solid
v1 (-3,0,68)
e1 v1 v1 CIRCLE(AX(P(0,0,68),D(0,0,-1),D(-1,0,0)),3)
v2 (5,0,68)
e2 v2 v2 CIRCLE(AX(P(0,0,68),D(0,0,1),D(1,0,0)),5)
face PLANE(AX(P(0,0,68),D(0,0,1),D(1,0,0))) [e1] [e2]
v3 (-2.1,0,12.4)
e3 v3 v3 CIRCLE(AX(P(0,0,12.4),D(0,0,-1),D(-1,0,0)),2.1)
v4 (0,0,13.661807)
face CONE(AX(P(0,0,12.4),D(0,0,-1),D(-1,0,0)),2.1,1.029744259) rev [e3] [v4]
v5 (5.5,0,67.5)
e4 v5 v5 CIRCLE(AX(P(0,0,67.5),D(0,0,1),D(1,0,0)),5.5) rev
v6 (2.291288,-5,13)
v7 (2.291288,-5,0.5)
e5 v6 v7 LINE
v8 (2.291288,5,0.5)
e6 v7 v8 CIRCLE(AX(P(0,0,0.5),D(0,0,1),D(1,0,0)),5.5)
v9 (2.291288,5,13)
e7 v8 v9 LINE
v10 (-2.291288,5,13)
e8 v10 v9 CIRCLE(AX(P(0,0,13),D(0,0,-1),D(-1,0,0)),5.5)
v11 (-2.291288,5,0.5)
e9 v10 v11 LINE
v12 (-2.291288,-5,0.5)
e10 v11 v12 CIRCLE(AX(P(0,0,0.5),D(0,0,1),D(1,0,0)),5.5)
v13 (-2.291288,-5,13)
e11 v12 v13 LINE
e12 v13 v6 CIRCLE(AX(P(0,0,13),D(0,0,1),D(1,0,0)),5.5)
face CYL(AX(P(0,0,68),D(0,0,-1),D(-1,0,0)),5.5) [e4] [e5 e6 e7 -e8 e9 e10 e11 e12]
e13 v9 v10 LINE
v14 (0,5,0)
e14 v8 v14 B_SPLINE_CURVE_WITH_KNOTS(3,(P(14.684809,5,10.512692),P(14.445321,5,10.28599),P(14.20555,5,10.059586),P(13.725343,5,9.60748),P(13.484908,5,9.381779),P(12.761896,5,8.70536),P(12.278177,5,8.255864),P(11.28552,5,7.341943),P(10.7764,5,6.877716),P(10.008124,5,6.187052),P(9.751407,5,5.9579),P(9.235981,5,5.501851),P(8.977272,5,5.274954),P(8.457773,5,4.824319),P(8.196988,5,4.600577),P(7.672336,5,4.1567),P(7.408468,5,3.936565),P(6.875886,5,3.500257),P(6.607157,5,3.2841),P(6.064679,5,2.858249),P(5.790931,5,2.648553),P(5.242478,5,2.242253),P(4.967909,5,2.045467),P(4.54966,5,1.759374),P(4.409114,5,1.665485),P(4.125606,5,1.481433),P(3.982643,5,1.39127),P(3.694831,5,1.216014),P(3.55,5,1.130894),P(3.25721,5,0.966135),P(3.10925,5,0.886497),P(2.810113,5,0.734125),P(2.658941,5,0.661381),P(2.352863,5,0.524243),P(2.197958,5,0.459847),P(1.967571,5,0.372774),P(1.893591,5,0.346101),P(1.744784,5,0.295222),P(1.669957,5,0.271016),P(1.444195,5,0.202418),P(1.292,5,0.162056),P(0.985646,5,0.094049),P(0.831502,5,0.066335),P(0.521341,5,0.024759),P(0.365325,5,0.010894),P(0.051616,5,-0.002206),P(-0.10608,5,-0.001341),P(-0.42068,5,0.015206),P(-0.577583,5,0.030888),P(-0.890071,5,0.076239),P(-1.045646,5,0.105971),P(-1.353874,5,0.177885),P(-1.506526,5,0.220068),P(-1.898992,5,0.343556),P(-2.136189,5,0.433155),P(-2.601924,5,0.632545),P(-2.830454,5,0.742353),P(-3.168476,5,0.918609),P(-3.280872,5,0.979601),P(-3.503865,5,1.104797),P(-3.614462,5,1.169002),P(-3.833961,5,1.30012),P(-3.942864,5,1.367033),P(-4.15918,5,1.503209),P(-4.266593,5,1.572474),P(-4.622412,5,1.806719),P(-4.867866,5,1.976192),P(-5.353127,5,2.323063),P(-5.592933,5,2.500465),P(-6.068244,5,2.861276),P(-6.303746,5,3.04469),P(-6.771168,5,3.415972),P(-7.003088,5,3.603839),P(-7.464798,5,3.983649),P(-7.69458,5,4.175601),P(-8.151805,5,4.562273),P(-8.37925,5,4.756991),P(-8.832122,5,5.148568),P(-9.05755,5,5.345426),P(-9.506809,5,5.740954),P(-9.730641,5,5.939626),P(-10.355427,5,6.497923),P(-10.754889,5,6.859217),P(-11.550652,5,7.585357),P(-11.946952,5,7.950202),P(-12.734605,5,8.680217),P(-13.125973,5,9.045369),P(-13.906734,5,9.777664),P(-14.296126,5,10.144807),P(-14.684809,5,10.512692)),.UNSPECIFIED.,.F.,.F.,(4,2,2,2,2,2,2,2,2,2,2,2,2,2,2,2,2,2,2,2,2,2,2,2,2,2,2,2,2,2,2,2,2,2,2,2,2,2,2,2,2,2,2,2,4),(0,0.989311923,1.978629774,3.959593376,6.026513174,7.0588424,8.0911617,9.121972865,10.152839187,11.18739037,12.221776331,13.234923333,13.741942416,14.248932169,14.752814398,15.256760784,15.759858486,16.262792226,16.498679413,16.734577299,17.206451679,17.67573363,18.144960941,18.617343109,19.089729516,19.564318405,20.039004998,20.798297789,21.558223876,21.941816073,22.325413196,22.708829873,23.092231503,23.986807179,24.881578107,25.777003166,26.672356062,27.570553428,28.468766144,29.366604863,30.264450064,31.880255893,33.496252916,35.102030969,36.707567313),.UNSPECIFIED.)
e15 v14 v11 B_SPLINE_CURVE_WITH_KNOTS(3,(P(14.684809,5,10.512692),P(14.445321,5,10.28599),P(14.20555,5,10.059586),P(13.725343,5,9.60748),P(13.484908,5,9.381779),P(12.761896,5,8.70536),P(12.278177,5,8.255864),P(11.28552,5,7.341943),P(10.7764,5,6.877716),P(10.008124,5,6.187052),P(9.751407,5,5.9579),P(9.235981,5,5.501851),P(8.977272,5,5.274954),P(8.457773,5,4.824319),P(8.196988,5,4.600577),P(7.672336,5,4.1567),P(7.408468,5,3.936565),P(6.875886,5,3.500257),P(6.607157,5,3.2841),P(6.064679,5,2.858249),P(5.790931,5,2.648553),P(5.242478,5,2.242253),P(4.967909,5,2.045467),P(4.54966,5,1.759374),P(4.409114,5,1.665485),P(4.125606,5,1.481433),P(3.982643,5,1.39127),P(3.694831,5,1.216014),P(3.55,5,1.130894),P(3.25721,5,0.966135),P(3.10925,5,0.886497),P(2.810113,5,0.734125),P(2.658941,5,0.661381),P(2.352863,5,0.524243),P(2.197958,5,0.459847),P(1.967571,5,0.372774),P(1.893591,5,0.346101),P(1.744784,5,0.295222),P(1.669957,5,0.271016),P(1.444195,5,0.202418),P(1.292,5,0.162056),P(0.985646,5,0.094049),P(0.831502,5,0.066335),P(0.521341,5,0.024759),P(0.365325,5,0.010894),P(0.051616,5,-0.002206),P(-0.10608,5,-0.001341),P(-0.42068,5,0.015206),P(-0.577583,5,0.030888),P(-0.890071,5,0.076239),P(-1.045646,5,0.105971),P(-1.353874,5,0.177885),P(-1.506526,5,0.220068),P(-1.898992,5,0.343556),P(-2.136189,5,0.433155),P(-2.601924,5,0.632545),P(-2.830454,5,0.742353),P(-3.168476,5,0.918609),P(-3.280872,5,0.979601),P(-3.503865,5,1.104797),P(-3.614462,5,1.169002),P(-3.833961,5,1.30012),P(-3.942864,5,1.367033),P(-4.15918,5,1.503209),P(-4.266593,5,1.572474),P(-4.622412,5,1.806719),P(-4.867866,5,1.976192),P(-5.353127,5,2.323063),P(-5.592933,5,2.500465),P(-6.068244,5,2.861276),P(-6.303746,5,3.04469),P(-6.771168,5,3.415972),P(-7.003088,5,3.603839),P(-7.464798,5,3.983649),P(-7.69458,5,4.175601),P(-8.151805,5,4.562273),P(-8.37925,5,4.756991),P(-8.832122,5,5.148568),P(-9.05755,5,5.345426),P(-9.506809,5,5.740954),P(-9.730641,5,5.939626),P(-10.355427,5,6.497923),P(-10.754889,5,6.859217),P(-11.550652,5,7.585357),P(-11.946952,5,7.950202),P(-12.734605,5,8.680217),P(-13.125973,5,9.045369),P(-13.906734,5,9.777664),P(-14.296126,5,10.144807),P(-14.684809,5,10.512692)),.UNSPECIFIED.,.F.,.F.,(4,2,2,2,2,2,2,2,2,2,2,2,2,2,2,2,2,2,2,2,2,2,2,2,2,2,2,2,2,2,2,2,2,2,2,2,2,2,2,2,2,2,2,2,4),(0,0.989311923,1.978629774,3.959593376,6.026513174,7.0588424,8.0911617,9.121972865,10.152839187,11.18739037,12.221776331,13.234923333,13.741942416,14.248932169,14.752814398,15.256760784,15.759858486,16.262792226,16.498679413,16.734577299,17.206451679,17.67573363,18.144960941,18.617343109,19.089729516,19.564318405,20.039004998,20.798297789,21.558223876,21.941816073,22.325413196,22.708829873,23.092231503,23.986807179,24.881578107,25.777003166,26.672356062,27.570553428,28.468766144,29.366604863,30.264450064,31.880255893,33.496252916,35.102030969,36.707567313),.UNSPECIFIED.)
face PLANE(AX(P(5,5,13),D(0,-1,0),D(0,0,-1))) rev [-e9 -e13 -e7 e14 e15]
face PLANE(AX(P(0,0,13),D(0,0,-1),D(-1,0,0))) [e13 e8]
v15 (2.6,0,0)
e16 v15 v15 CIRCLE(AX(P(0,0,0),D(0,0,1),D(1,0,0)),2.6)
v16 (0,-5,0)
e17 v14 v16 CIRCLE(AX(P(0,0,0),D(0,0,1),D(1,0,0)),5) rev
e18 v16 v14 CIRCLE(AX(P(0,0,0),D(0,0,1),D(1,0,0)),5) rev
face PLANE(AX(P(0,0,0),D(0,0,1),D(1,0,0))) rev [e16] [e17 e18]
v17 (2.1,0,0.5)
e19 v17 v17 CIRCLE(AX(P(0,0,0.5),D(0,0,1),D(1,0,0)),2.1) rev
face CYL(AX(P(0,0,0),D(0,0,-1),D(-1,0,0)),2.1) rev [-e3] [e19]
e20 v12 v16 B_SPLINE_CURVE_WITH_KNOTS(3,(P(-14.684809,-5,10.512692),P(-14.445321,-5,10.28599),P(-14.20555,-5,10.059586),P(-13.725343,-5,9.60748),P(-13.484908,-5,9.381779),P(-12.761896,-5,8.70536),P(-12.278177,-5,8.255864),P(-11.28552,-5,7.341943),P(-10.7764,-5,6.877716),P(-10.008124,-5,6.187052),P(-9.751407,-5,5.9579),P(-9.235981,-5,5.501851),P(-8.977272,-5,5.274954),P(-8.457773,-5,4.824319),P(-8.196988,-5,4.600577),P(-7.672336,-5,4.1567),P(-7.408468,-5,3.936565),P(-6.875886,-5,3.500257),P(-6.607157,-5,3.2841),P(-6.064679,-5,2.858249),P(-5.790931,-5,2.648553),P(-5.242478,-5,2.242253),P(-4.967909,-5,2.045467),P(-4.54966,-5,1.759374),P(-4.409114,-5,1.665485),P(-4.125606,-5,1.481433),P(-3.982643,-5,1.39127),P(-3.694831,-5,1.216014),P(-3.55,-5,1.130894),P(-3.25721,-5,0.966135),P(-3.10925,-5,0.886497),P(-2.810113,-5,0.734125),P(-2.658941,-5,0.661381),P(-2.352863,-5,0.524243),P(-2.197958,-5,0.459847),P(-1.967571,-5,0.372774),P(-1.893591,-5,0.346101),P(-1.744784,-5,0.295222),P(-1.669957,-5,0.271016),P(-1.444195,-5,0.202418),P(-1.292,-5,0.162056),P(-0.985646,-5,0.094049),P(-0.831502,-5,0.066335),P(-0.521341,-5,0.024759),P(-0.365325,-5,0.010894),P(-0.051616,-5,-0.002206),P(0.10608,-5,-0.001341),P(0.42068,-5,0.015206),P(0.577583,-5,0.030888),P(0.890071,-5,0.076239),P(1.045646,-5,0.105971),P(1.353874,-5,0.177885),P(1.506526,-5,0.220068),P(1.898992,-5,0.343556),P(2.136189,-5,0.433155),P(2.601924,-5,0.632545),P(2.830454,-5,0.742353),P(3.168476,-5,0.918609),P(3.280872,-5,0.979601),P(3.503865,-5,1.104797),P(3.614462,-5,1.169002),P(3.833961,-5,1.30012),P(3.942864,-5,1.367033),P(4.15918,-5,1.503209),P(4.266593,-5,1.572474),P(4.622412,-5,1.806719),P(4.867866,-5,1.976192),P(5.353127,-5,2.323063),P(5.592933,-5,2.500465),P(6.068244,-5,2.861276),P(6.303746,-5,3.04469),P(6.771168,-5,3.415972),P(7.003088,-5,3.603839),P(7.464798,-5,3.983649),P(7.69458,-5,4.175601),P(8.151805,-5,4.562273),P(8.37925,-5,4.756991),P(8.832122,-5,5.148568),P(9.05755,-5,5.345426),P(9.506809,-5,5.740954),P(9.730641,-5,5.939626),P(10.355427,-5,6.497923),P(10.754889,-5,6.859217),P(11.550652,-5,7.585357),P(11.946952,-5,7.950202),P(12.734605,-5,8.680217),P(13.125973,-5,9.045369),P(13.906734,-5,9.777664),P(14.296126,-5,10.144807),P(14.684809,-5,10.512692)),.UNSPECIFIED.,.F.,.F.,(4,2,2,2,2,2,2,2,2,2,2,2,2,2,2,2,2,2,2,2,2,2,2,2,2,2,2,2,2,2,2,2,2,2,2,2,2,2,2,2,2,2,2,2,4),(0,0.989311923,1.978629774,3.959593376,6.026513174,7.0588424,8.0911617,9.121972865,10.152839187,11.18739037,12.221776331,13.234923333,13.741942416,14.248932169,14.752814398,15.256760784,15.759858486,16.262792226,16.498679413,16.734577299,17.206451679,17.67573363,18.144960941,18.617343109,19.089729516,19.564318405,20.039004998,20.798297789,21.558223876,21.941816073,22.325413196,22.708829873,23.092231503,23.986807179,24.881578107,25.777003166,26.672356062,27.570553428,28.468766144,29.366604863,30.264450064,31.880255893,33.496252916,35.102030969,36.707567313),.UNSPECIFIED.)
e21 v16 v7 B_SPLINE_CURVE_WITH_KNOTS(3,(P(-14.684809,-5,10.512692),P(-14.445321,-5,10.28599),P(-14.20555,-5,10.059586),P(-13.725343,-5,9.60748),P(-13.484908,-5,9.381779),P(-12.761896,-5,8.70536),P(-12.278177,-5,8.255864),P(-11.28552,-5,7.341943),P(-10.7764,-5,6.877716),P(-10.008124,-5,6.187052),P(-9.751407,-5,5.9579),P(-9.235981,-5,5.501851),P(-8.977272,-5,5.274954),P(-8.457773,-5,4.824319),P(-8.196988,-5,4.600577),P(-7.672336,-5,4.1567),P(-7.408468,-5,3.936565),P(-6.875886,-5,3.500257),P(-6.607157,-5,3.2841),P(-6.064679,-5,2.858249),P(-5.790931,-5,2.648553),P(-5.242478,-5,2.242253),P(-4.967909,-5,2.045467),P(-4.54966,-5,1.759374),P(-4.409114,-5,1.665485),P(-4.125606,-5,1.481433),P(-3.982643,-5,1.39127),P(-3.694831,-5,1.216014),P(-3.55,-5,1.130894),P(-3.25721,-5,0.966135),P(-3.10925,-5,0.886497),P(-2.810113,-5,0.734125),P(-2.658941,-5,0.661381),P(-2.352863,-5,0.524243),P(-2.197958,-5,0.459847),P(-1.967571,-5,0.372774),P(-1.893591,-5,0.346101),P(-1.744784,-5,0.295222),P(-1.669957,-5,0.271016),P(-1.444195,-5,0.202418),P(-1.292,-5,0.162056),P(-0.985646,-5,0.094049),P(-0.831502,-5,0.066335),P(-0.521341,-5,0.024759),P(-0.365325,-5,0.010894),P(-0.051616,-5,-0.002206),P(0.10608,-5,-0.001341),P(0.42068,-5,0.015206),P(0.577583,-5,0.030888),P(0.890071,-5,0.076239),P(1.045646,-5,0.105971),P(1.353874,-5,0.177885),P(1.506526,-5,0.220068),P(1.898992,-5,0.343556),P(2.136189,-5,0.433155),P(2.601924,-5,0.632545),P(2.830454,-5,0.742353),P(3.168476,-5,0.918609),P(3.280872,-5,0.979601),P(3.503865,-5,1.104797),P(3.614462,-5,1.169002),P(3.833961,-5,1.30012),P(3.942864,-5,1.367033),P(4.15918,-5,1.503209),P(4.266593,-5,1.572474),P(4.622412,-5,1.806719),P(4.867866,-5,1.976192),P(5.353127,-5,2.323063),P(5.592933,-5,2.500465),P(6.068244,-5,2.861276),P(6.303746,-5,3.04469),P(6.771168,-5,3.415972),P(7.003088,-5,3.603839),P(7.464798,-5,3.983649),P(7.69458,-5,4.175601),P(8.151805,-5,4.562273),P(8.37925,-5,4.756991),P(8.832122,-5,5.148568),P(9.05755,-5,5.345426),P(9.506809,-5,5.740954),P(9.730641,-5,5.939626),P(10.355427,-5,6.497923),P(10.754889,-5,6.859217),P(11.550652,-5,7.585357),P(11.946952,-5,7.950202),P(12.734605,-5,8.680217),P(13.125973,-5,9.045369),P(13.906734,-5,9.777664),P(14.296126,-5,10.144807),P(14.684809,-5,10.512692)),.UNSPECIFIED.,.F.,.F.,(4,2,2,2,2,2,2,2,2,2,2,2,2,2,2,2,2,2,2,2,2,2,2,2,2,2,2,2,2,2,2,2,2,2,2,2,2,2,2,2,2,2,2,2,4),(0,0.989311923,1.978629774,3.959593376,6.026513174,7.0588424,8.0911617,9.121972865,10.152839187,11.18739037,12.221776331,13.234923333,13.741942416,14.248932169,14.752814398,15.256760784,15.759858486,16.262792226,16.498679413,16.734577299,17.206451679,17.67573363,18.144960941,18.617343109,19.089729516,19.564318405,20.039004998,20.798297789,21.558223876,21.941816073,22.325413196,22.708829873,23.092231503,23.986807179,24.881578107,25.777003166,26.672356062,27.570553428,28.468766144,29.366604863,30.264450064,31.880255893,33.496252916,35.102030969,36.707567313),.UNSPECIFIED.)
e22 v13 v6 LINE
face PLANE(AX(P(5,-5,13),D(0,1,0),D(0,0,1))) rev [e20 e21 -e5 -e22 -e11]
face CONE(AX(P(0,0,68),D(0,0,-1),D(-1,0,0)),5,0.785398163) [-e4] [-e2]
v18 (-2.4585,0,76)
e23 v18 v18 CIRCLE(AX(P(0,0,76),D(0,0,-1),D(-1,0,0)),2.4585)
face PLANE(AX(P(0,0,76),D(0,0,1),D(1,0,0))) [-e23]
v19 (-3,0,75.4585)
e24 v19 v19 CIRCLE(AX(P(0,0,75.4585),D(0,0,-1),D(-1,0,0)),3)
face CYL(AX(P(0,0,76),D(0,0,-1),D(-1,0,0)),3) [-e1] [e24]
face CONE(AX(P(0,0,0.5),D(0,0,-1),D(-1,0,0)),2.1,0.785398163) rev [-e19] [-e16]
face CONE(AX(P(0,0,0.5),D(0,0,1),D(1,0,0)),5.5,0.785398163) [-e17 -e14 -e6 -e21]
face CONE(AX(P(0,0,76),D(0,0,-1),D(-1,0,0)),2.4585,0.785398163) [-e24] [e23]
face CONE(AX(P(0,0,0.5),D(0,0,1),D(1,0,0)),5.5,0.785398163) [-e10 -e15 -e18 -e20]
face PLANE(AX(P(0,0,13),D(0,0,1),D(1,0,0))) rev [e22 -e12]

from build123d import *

# Parameters (mm, degrees)
SKETCH_1_R             = 5.5
EXTRUDE_1_DEPTH        = 68
CHAMFER_1_SIZE         = 0.5
SKETCH_2_R             = 3.3
EXTRUDE_2_DEPTH        = 8
HOLE_WIZARD_M5_1_D     = 4.2
HOLE_WIZARD_M5_1_DEPTH = 12.4
HOLE_WIZARD_M5_1_TIP   = 1.2618073
CHAMFER_3_SIZE         = 0.5
SKETCH_6_W             = 10
SKETCH_6_H             = 3
CUT_EXTRUDE_1_DEPTH    = 13


# Read off the part's stored shape, not the designer's step: M6 机械螺纹 螺柱1
with BuildPart() as part:
    # 草图1 → 拉伸1 (new body)
    with BuildSketch(Plane.XY):
        Circle(SKETCH_1_R)
    extrude(amount=EXTRUDE_1_DEPTH)

    # 倒角1
    chamfer_1_edges = [part.edges().sort_by_distance(p)[0] for p in [
        (-5.5, 0, 0),
        (-5.5, 0, 68),
    ]]
    chamfer(chamfer_1_edges, length=CHAMFER_1_SIZE)

    # 草图2 → 拉伸2 (add)
    with BuildSketch(Plane.XY.offset(68)):
        Circle(SKETCH_2_R)
    extrude(amount=EXTRUDE_2_DEPTH)

    # M5 螺纹孔1
    with Locations(Plane(origin=(0, 0, 0), x_dir=(-1, 0, 0), z_dir=(0, 0, -1))):
        with Locations((0, 0)):
            Hole(HOLE_WIZARD_M5_1_D / 2, depth=HOLE_WIZARD_M5_1_DEPTH)
            with Locations((0, 0, -(HOLE_WIZARD_M5_1_DEPTH + HOLE_WIZARD_M5_1_TIP / 2))):  # 118° drill point
                Cone(0, HOLE_WIZARD_M5_1_D / 2, HOLE_WIZARD_M5_1_TIP, mode=Mode.SUBTRACT)

    # 倒角3
    chamfer_3_edges = [part.edges().sort_by_distance(p)[0] for p in [
        (-2.1, 0, 0),
    ]]
    chamfer(chamfer_3_edges, length=CHAMFER_3_SIZE)

    # 草图6 → 切除-拉伸1 (cut)
    with BuildSketch(Plane(origin=(0, 0, 0), x_dir=(-1, 0, 0), z_dir=(0, 0, -1))):
        with Locations((0, 6.5)):
            Rectangle(SKETCH_6_W, SKETCH_6_H)
        with Locations((0, -6.5)):
            Rectangle(SKETCH_6_W, SKETCH_6_H)
    extrude(amount=-CUT_EXTRUDE_1_DEPTH, mode=Mode.SUBTRACT)

    # M6 机械螺纹 螺柱1 outline → M6 机械螺纹 螺柱1 (revolve, cut)
    with BuildSketch(Plane.XZ):
        Polygon((3.3, 76), (2.4585, 76), (3, 75.4585), (3, 68), (3.3, 68), align=None)
    revolve(axis=Axis((0, 0, 0), (0, 0, 1)), mode=Mode.SUBTRACT)


solid = part.part
